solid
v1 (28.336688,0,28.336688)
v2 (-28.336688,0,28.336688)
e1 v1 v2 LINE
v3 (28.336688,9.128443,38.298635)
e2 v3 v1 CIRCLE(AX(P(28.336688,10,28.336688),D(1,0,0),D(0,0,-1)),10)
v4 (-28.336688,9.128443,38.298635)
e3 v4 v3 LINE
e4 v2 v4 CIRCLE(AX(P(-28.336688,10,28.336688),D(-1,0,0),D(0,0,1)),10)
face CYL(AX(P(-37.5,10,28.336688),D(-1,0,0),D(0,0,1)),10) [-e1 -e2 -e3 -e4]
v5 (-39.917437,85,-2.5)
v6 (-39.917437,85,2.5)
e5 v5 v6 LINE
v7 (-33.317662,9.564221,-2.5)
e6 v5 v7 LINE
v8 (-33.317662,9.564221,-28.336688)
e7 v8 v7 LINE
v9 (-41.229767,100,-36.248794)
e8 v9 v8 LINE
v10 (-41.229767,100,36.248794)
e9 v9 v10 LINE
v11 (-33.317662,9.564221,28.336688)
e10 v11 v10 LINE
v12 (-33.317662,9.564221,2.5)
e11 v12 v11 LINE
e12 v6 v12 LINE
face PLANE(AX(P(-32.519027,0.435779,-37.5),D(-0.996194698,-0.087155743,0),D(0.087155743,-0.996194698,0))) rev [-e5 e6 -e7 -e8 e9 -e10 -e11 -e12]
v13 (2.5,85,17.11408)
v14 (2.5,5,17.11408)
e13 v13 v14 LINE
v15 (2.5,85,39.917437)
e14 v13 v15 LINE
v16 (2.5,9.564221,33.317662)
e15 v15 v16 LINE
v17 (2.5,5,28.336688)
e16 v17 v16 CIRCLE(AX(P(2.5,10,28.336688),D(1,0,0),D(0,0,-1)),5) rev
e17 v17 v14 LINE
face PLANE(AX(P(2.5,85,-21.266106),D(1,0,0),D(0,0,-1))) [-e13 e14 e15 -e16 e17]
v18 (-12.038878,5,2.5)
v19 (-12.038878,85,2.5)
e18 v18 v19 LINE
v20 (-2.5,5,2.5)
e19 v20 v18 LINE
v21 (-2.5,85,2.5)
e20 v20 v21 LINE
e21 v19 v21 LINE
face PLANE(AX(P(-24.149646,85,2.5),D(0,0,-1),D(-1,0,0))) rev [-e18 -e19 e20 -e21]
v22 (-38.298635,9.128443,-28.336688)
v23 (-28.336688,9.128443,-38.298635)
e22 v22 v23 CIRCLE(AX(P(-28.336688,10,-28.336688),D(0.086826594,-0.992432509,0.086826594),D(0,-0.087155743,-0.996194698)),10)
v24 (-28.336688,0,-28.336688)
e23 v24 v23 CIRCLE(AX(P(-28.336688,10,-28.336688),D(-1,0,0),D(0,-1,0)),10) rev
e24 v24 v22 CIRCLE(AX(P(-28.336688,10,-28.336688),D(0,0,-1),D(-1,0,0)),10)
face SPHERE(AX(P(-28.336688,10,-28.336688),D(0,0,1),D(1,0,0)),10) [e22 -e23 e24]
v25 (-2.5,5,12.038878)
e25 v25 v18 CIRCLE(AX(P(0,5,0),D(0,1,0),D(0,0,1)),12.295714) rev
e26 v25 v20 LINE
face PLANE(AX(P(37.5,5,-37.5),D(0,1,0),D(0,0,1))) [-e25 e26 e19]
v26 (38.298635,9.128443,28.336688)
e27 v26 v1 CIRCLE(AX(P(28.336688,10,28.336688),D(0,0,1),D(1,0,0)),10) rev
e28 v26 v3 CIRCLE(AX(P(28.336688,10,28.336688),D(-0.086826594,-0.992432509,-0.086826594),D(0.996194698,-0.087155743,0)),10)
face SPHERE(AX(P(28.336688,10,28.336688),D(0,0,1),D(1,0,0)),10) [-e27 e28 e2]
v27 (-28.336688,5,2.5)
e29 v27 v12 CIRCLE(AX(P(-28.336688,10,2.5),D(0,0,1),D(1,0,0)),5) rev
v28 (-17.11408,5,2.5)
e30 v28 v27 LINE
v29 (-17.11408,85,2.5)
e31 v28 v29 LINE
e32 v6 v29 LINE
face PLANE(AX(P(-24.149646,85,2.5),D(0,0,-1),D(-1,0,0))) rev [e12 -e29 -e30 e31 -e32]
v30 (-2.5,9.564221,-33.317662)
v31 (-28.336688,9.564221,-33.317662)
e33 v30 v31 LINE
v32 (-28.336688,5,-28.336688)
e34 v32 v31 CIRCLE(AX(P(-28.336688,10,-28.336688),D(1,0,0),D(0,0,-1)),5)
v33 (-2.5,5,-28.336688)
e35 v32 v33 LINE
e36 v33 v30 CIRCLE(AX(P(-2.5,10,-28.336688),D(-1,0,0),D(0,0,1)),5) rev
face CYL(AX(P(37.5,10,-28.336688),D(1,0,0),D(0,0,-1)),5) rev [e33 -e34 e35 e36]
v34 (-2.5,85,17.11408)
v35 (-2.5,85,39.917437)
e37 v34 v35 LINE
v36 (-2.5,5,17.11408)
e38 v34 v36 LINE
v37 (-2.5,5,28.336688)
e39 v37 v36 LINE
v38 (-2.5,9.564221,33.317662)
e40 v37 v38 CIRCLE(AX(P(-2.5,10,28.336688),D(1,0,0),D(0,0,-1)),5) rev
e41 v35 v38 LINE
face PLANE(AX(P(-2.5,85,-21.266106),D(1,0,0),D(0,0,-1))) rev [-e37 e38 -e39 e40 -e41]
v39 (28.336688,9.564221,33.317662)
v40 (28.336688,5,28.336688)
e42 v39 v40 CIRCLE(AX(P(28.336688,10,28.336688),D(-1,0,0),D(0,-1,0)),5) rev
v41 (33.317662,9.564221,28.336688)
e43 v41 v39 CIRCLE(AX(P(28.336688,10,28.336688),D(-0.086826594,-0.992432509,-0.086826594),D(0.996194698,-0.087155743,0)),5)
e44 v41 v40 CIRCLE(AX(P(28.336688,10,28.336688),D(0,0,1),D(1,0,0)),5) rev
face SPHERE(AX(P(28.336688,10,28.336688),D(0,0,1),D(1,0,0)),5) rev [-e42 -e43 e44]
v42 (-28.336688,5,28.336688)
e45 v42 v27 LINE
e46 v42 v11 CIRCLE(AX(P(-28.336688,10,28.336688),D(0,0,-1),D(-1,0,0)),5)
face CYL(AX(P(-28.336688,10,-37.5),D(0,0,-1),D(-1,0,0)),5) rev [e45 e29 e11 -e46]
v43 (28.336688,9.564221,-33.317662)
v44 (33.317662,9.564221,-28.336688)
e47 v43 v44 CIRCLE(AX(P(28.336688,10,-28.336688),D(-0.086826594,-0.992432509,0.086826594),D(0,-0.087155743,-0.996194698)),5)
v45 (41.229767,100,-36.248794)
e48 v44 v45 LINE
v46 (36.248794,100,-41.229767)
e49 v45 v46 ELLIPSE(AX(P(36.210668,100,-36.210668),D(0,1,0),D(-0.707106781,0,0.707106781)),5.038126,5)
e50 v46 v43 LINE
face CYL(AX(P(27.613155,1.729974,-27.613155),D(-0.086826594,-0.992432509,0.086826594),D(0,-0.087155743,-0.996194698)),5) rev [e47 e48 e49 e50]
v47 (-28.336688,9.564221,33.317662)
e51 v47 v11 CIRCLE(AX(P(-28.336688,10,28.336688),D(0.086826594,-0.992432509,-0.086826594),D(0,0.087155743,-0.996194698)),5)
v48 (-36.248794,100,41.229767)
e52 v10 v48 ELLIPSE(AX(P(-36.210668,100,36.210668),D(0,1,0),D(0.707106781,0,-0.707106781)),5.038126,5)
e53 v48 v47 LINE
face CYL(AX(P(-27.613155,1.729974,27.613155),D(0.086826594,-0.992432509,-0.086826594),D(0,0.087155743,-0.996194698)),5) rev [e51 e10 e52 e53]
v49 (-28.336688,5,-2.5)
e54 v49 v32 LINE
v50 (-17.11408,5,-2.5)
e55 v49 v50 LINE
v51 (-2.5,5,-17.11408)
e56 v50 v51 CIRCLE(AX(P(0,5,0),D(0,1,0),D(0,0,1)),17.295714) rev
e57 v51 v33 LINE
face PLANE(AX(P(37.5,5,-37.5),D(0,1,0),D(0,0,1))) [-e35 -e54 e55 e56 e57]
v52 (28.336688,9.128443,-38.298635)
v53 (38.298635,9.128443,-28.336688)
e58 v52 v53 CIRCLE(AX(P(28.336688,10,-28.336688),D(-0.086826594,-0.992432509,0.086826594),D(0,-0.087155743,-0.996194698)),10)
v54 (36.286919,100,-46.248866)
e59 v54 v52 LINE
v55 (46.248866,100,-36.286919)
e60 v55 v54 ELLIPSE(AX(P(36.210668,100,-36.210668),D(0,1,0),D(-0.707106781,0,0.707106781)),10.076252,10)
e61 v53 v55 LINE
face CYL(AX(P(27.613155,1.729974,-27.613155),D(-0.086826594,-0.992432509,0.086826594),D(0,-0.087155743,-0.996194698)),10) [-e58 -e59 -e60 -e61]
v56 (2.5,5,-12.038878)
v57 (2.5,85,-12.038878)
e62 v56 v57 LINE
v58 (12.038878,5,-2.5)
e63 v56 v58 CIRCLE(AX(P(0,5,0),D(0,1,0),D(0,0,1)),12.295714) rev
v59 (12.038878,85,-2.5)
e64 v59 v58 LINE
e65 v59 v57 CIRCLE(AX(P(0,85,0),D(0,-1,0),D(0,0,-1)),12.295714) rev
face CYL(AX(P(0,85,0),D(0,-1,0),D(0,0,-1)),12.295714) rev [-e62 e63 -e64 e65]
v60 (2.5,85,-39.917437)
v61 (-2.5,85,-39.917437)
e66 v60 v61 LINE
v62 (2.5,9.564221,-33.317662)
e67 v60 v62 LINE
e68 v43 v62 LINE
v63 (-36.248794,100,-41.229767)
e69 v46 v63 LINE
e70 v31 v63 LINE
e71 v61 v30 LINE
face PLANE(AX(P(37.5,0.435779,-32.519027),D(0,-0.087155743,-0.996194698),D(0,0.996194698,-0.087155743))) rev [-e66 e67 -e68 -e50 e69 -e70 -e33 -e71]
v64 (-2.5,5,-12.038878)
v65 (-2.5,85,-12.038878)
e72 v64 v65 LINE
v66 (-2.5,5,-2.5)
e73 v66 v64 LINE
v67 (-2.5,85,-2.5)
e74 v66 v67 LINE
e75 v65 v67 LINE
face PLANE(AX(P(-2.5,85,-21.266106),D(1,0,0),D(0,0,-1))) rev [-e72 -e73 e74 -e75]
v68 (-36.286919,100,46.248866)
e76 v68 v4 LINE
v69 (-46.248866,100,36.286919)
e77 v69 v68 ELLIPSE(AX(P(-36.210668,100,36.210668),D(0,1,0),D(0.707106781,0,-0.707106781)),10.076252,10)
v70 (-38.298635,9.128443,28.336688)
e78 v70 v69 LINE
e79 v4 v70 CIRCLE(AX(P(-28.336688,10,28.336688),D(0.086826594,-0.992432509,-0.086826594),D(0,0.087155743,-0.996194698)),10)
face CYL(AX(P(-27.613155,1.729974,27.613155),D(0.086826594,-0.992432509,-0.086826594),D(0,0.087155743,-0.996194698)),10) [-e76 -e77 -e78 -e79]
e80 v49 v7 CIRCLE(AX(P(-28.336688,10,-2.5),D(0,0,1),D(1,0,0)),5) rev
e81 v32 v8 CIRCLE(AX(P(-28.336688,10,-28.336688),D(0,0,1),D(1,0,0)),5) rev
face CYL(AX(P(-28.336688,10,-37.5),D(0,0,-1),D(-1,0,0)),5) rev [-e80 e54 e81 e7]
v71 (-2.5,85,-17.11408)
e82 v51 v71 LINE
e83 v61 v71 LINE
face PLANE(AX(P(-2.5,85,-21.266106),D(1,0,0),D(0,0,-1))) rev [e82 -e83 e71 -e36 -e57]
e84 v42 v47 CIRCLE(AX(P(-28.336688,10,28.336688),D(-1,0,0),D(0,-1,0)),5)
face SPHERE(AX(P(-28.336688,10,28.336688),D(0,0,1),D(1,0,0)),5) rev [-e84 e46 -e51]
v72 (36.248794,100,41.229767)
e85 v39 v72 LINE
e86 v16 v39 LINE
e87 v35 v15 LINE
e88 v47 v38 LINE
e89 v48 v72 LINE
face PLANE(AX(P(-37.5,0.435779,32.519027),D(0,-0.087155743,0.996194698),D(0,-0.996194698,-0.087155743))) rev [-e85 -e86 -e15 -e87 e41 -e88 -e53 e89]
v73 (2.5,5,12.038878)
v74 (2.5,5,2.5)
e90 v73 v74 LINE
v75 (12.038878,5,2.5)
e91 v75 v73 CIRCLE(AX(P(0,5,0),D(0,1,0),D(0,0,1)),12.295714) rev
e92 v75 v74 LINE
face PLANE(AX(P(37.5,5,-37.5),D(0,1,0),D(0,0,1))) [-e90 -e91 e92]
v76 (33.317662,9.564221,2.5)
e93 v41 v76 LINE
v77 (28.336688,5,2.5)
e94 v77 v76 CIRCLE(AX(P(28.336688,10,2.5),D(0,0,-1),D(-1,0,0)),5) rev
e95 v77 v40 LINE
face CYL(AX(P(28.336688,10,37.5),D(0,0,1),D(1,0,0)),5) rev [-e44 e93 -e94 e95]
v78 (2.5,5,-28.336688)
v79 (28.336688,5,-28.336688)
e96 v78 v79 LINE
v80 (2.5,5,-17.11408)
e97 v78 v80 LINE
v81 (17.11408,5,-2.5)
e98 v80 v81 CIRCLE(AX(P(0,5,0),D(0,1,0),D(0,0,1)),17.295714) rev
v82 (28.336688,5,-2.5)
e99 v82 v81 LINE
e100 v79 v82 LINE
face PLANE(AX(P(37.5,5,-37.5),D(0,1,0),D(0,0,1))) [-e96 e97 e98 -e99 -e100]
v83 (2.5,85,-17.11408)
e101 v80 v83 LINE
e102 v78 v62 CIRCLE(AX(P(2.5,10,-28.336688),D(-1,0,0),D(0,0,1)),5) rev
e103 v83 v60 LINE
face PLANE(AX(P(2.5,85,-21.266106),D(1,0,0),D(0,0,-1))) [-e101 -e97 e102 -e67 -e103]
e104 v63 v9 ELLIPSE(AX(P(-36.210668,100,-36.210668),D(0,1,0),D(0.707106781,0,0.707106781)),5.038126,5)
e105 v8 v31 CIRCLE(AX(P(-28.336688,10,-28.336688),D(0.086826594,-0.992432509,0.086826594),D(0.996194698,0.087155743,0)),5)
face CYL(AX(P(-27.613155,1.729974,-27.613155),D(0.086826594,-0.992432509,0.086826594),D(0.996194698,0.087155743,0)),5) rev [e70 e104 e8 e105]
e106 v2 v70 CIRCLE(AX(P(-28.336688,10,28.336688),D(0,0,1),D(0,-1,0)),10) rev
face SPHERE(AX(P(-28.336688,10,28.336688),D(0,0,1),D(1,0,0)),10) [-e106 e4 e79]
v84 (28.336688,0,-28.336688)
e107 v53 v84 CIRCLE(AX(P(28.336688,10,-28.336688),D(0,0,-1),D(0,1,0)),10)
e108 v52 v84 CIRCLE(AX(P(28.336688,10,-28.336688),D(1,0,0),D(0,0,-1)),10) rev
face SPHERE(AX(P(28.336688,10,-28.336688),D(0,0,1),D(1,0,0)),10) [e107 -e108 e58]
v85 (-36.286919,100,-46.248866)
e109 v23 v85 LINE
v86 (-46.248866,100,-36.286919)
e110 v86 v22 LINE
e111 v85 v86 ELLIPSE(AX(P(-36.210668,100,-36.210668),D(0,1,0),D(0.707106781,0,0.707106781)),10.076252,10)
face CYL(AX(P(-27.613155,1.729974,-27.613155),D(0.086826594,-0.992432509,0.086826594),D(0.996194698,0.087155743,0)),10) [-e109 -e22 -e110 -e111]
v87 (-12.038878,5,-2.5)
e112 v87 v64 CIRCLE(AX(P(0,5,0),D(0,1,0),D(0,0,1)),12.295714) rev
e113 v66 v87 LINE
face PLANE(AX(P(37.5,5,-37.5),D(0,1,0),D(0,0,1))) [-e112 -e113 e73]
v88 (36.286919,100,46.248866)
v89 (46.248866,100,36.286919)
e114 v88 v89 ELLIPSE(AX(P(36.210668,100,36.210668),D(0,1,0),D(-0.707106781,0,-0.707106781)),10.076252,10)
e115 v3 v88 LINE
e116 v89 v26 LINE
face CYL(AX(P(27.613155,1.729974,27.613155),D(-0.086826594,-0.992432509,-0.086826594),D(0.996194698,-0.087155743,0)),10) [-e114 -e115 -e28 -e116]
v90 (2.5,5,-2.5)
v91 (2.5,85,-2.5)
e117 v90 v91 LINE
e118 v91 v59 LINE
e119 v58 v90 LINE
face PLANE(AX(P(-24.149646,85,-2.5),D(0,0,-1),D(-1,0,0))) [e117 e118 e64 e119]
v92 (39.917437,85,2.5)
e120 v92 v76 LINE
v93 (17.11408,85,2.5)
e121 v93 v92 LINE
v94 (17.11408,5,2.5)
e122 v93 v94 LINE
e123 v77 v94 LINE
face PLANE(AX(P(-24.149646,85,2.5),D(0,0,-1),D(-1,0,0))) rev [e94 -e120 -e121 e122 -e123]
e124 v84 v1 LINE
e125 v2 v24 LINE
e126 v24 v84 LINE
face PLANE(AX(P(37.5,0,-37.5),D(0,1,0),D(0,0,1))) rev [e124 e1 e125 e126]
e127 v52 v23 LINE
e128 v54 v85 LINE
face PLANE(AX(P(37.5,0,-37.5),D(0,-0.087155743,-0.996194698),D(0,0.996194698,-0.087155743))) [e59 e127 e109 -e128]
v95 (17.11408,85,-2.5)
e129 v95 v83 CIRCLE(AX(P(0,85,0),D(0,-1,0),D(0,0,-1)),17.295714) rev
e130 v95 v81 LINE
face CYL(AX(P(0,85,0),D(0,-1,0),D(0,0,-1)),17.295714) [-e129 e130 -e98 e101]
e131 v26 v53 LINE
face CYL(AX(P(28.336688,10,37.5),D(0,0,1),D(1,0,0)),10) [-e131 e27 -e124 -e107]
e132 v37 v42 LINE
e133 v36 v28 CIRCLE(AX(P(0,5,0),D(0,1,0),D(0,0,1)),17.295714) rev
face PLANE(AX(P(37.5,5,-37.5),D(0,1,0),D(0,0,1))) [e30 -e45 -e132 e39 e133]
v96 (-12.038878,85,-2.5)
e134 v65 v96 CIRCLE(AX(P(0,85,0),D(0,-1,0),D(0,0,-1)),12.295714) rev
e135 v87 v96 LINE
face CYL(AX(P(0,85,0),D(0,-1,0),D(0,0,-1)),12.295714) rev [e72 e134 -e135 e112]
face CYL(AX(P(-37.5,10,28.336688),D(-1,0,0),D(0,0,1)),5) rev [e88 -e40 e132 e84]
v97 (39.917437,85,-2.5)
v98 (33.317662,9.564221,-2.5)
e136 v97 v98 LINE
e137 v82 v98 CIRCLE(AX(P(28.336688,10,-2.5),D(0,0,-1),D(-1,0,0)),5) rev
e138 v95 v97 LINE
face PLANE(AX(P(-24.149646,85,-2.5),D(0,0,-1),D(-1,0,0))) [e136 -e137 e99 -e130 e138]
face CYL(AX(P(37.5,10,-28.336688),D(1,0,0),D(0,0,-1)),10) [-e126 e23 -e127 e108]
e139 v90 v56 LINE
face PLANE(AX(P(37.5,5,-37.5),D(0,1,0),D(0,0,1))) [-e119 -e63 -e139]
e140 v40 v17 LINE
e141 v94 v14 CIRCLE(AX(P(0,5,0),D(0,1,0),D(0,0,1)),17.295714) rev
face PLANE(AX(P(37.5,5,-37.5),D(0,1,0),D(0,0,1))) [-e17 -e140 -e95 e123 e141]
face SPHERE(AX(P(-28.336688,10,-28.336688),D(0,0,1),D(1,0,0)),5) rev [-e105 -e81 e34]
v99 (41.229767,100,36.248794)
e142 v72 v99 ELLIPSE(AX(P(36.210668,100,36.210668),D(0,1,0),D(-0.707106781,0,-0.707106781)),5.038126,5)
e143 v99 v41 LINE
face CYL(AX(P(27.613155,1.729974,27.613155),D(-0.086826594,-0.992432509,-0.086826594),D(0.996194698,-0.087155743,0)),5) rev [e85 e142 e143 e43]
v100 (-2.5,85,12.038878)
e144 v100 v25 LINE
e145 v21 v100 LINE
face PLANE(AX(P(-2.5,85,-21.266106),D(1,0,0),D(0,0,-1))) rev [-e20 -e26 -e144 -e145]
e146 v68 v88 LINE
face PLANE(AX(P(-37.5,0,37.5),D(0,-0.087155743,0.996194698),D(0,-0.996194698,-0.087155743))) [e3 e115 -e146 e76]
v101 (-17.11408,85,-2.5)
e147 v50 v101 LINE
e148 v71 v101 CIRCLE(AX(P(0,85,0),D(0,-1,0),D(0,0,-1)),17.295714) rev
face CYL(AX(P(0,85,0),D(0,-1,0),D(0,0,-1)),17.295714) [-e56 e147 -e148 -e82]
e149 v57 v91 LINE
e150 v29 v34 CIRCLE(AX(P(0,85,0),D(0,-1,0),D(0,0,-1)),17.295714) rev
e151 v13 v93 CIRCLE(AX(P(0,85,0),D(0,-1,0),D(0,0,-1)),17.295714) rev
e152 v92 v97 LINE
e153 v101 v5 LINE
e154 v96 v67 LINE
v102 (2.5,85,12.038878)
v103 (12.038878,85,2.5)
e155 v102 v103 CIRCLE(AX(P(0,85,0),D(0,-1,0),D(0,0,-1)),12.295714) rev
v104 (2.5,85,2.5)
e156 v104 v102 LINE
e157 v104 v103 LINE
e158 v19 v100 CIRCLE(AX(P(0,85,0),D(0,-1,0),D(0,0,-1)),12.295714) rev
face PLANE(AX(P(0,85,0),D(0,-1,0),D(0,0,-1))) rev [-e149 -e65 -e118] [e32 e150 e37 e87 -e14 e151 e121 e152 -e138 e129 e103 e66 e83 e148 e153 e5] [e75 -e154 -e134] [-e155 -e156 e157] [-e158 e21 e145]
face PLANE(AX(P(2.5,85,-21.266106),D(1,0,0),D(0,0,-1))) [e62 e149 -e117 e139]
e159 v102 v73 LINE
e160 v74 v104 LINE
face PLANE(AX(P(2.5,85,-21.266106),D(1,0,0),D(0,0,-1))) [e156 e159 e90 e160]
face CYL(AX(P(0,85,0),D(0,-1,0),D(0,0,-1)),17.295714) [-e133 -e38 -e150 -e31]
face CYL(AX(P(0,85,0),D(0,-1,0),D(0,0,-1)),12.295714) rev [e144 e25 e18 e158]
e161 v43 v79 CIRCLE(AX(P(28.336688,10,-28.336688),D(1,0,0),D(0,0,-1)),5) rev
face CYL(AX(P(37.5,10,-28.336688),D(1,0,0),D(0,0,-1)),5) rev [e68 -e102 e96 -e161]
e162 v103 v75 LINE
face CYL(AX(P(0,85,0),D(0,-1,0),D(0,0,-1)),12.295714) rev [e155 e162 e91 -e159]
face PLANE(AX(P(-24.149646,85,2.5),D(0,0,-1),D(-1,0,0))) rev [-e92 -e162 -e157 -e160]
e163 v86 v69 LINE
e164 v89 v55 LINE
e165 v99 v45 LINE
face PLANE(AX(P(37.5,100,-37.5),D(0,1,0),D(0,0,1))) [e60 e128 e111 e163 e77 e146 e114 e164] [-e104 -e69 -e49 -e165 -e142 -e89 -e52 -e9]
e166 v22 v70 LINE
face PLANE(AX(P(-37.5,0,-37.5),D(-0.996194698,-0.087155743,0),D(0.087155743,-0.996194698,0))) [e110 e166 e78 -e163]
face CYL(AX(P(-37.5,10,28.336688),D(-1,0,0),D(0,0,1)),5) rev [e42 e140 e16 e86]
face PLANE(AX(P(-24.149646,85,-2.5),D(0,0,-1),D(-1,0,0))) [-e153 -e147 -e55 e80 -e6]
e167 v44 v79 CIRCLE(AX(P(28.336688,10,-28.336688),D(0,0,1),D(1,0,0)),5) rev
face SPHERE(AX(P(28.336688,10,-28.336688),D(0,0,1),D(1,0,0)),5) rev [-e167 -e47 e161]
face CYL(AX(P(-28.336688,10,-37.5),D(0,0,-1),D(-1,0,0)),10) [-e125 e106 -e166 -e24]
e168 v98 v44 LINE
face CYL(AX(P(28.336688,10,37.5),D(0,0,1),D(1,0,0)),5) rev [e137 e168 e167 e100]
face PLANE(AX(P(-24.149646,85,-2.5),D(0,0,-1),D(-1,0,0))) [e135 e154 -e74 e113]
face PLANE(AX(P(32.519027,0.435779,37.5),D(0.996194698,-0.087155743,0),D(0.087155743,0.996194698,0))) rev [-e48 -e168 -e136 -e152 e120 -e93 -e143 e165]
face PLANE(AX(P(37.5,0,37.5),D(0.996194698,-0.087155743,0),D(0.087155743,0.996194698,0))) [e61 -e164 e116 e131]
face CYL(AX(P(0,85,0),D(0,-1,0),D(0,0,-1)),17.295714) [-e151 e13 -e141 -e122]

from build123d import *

# Parameters (mm, degrees)
SKETCH1_W          = 75
SKETCH1_H          = 75
BASE_EXTRUDE_DEPTH = 100
BASE_EXTRUDE_DRAFT = -5
FILLET1_R          = 10
SHELL1_T           = -5
RIB1_START         = -2.5
RIB1_DEPTH         = 5
RIB1_START_2       = -36.248793674
RIB1_2_OUTLINE_W   = 80
RIB1_2_OUTLINE_H   = 5
RIB1_2_DEPTH       = 72.497587348
RIB1_START_3       = 5
RIB1_3_DEPTH       = 80
RIB1_START_4       = 43.067212481
RIB1_4_OUTLINE_W   = 3.751206326
RIB1_4_OUTLINE_H   = 5
RIB1_4_DEPTH       = 41.932787519


with BuildPart() as part:
    # Sketch1 → Base-Extrude (with draft: the straight prism first)
    with BuildSketch(Plane(origin=(0, 0, 0), x_dir=(1, 0, 0), z_dir=(0, 1, 0))):
        Rectangle(SKETCH1_W, SKETCH1_H)
    extrude(amount=BASE_EXTRUDE_DEPTH)
    # Base-Extrude: the draft: its side faces are tilted about the plane it starts from
    base_extrude_sides = [part.faces().sort_by_distance(p)[0] for p in [
        (0, 50, -37.5),
        (-37.5, 50, 0),
        (0, 50, 37.5),
        (37.5, 50, 0),
    ]]
    draft(base_extrude_sides, Plane(origin=(0, 0, 0), x_dir=(1, 0, 0), z_dir=(0, 1, 0)), BASE_EXTRUDE_DRAFT)

    # Fillet1
    fillet1_edges = [part.edges().sort_by_distance(p)[0] for p in [
        (0, 0, 37.5),
        (-37.5, 0, 0),
        (0, 0, -37.5),
        (37.5, 0, 0),
        (41.874433176, 50, 41.874433176),
        (-41.874433176, 50, 41.874433176),
        (-41.874433176, 50, -41.874433176),
        (41.874433176, 50, -41.874433176),
    ]]
    fillet(fillet1_edges, radius=FILLET1_R)

    # Shell1
    shell1_openings = [part.faces().sort_by_distance(p)[0] for p in [
        (0, 100, 0),
    ]]
    offset(amount=SHELL1_T, openings=shell1_openings, kind=Kind.INTERSECTION)

    # Rib1: read off the stored shape, not the designer's step
    # Rib1 outline → Rib1 (add)
    with BuildSketch(Plane.YZ.offset(RIB1_START)):
        with BuildLine():
            Line((85, 39.917437212), (9.564221286, 33.31766175))
            ThreePointArc((9.564221286, 33.31766175), (6.313613316, 31.714639298), (5, 28.33668826))
            Line((5, 28.33668826), (5, -28.33668826))
            ThreePointArc((5, -28.33668826), (6.313613316, -31.714639298), (9.564221286, -33.31766175))
            Line((9.564221286, -33.31766175), (85, -39.917437212))
            Line((85, -39.917437212), (85, 39.917437212))
        make_face()
    extrude(amount=RIB1_DEPTH)

    # Rib1 2 outline → Rib1 2 (add)
    with BuildSketch(Plane.YZ.offset(RIB1_START_2)):
        with Locations((45, 0)):
            Rectangle(RIB1_2_OUTLINE_W, RIB1_2_OUTLINE_H)
    extrude(amount=RIB1_2_DEPTH)

    # Rib1 3 outline → Rib1 3 (add)
    with BuildSketch(Plane(origin=(0, 0, 0), x_dir=(1, 0, 0), z_dir=(0, 1, 0)).offset(RIB1_START_3)):
        with BuildLine():
            ThreePointArc((-2.5, -12.038877834), (-8.694382655, -8.694382655), (-12.038877834, -2.5))
            Line((-12.038877834, -2.5), (-17.11407953, -2.5))
            ThreePointArc((-17.11407953, -2.5), (-12.229916561, -12.229916561), (-2.5, -17.11407953))
            Line((-2.5, -17.11407953), (-2.5, -12.038877834))
        make_face()
        with BuildLine():
            ThreePointArc((2.5, -17.11407953), (12.229916561, -12.229916561), (17.11407953, -2.5))
            Line((17.11407953, -2.5), (12.038877834, -2.5))
            ThreePointArc((12.038877834, -2.5), (8.694382655, -8.694382655), (2.5, -12.038877834))
            Line((2.5, -12.038877834), (2.5, -17.11407953))
        make_face()
        with BuildLine():
            Line((-17.11407953, 2.5), (-12.038877834, 2.5))
            ThreePointArc((-12.038877834, 2.5), (-8.694382655, 8.694382655), (-2.5, 12.038877834))
            Line((-2.5, 12.038877834), (-2.5, 17.11407953))
            ThreePointArc((-2.5, 17.11407953), (-12.229916561, 12.229916561), (-17.11407953, 2.5))
        make_face()
        with BuildLine():
            ThreePointArc((17.11407953, 2.5), (12.229916561, 12.229916561), (2.5, 17.11407953))
            Line((2.5, 17.11407953), (2.5, 12.038877834))
            ThreePointArc((2.5, 12.038877834), (8.694382655, 8.694382655), (12.038877834, 2.5))
            Line((12.038877834, 2.5), (17.11407953, 2.5))
        make_face()
    extrude(amount=RIB1_3_DEPTH)

    # Rib1 4 outline → Rib1 4 (add)
    with BuildSketch(Plane(origin=(0, 0, 0), x_dir=(1, 0, 0), z_dir=(0, 1, 0)).offset(RIB1_START_4)):
        with Locations((-38.124396837, 0)):
            Rectangle(RIB1_4_OUTLINE_W, RIB1_4_OUTLINE_H)
        with Locations((38.124396837, 0)):
            Rectangle(RIB1_4_OUTLINE_W, RIB1_4_OUTLINE_H)
    extrude(amount=RIB1_4_DEPTH)


solid = part.part
